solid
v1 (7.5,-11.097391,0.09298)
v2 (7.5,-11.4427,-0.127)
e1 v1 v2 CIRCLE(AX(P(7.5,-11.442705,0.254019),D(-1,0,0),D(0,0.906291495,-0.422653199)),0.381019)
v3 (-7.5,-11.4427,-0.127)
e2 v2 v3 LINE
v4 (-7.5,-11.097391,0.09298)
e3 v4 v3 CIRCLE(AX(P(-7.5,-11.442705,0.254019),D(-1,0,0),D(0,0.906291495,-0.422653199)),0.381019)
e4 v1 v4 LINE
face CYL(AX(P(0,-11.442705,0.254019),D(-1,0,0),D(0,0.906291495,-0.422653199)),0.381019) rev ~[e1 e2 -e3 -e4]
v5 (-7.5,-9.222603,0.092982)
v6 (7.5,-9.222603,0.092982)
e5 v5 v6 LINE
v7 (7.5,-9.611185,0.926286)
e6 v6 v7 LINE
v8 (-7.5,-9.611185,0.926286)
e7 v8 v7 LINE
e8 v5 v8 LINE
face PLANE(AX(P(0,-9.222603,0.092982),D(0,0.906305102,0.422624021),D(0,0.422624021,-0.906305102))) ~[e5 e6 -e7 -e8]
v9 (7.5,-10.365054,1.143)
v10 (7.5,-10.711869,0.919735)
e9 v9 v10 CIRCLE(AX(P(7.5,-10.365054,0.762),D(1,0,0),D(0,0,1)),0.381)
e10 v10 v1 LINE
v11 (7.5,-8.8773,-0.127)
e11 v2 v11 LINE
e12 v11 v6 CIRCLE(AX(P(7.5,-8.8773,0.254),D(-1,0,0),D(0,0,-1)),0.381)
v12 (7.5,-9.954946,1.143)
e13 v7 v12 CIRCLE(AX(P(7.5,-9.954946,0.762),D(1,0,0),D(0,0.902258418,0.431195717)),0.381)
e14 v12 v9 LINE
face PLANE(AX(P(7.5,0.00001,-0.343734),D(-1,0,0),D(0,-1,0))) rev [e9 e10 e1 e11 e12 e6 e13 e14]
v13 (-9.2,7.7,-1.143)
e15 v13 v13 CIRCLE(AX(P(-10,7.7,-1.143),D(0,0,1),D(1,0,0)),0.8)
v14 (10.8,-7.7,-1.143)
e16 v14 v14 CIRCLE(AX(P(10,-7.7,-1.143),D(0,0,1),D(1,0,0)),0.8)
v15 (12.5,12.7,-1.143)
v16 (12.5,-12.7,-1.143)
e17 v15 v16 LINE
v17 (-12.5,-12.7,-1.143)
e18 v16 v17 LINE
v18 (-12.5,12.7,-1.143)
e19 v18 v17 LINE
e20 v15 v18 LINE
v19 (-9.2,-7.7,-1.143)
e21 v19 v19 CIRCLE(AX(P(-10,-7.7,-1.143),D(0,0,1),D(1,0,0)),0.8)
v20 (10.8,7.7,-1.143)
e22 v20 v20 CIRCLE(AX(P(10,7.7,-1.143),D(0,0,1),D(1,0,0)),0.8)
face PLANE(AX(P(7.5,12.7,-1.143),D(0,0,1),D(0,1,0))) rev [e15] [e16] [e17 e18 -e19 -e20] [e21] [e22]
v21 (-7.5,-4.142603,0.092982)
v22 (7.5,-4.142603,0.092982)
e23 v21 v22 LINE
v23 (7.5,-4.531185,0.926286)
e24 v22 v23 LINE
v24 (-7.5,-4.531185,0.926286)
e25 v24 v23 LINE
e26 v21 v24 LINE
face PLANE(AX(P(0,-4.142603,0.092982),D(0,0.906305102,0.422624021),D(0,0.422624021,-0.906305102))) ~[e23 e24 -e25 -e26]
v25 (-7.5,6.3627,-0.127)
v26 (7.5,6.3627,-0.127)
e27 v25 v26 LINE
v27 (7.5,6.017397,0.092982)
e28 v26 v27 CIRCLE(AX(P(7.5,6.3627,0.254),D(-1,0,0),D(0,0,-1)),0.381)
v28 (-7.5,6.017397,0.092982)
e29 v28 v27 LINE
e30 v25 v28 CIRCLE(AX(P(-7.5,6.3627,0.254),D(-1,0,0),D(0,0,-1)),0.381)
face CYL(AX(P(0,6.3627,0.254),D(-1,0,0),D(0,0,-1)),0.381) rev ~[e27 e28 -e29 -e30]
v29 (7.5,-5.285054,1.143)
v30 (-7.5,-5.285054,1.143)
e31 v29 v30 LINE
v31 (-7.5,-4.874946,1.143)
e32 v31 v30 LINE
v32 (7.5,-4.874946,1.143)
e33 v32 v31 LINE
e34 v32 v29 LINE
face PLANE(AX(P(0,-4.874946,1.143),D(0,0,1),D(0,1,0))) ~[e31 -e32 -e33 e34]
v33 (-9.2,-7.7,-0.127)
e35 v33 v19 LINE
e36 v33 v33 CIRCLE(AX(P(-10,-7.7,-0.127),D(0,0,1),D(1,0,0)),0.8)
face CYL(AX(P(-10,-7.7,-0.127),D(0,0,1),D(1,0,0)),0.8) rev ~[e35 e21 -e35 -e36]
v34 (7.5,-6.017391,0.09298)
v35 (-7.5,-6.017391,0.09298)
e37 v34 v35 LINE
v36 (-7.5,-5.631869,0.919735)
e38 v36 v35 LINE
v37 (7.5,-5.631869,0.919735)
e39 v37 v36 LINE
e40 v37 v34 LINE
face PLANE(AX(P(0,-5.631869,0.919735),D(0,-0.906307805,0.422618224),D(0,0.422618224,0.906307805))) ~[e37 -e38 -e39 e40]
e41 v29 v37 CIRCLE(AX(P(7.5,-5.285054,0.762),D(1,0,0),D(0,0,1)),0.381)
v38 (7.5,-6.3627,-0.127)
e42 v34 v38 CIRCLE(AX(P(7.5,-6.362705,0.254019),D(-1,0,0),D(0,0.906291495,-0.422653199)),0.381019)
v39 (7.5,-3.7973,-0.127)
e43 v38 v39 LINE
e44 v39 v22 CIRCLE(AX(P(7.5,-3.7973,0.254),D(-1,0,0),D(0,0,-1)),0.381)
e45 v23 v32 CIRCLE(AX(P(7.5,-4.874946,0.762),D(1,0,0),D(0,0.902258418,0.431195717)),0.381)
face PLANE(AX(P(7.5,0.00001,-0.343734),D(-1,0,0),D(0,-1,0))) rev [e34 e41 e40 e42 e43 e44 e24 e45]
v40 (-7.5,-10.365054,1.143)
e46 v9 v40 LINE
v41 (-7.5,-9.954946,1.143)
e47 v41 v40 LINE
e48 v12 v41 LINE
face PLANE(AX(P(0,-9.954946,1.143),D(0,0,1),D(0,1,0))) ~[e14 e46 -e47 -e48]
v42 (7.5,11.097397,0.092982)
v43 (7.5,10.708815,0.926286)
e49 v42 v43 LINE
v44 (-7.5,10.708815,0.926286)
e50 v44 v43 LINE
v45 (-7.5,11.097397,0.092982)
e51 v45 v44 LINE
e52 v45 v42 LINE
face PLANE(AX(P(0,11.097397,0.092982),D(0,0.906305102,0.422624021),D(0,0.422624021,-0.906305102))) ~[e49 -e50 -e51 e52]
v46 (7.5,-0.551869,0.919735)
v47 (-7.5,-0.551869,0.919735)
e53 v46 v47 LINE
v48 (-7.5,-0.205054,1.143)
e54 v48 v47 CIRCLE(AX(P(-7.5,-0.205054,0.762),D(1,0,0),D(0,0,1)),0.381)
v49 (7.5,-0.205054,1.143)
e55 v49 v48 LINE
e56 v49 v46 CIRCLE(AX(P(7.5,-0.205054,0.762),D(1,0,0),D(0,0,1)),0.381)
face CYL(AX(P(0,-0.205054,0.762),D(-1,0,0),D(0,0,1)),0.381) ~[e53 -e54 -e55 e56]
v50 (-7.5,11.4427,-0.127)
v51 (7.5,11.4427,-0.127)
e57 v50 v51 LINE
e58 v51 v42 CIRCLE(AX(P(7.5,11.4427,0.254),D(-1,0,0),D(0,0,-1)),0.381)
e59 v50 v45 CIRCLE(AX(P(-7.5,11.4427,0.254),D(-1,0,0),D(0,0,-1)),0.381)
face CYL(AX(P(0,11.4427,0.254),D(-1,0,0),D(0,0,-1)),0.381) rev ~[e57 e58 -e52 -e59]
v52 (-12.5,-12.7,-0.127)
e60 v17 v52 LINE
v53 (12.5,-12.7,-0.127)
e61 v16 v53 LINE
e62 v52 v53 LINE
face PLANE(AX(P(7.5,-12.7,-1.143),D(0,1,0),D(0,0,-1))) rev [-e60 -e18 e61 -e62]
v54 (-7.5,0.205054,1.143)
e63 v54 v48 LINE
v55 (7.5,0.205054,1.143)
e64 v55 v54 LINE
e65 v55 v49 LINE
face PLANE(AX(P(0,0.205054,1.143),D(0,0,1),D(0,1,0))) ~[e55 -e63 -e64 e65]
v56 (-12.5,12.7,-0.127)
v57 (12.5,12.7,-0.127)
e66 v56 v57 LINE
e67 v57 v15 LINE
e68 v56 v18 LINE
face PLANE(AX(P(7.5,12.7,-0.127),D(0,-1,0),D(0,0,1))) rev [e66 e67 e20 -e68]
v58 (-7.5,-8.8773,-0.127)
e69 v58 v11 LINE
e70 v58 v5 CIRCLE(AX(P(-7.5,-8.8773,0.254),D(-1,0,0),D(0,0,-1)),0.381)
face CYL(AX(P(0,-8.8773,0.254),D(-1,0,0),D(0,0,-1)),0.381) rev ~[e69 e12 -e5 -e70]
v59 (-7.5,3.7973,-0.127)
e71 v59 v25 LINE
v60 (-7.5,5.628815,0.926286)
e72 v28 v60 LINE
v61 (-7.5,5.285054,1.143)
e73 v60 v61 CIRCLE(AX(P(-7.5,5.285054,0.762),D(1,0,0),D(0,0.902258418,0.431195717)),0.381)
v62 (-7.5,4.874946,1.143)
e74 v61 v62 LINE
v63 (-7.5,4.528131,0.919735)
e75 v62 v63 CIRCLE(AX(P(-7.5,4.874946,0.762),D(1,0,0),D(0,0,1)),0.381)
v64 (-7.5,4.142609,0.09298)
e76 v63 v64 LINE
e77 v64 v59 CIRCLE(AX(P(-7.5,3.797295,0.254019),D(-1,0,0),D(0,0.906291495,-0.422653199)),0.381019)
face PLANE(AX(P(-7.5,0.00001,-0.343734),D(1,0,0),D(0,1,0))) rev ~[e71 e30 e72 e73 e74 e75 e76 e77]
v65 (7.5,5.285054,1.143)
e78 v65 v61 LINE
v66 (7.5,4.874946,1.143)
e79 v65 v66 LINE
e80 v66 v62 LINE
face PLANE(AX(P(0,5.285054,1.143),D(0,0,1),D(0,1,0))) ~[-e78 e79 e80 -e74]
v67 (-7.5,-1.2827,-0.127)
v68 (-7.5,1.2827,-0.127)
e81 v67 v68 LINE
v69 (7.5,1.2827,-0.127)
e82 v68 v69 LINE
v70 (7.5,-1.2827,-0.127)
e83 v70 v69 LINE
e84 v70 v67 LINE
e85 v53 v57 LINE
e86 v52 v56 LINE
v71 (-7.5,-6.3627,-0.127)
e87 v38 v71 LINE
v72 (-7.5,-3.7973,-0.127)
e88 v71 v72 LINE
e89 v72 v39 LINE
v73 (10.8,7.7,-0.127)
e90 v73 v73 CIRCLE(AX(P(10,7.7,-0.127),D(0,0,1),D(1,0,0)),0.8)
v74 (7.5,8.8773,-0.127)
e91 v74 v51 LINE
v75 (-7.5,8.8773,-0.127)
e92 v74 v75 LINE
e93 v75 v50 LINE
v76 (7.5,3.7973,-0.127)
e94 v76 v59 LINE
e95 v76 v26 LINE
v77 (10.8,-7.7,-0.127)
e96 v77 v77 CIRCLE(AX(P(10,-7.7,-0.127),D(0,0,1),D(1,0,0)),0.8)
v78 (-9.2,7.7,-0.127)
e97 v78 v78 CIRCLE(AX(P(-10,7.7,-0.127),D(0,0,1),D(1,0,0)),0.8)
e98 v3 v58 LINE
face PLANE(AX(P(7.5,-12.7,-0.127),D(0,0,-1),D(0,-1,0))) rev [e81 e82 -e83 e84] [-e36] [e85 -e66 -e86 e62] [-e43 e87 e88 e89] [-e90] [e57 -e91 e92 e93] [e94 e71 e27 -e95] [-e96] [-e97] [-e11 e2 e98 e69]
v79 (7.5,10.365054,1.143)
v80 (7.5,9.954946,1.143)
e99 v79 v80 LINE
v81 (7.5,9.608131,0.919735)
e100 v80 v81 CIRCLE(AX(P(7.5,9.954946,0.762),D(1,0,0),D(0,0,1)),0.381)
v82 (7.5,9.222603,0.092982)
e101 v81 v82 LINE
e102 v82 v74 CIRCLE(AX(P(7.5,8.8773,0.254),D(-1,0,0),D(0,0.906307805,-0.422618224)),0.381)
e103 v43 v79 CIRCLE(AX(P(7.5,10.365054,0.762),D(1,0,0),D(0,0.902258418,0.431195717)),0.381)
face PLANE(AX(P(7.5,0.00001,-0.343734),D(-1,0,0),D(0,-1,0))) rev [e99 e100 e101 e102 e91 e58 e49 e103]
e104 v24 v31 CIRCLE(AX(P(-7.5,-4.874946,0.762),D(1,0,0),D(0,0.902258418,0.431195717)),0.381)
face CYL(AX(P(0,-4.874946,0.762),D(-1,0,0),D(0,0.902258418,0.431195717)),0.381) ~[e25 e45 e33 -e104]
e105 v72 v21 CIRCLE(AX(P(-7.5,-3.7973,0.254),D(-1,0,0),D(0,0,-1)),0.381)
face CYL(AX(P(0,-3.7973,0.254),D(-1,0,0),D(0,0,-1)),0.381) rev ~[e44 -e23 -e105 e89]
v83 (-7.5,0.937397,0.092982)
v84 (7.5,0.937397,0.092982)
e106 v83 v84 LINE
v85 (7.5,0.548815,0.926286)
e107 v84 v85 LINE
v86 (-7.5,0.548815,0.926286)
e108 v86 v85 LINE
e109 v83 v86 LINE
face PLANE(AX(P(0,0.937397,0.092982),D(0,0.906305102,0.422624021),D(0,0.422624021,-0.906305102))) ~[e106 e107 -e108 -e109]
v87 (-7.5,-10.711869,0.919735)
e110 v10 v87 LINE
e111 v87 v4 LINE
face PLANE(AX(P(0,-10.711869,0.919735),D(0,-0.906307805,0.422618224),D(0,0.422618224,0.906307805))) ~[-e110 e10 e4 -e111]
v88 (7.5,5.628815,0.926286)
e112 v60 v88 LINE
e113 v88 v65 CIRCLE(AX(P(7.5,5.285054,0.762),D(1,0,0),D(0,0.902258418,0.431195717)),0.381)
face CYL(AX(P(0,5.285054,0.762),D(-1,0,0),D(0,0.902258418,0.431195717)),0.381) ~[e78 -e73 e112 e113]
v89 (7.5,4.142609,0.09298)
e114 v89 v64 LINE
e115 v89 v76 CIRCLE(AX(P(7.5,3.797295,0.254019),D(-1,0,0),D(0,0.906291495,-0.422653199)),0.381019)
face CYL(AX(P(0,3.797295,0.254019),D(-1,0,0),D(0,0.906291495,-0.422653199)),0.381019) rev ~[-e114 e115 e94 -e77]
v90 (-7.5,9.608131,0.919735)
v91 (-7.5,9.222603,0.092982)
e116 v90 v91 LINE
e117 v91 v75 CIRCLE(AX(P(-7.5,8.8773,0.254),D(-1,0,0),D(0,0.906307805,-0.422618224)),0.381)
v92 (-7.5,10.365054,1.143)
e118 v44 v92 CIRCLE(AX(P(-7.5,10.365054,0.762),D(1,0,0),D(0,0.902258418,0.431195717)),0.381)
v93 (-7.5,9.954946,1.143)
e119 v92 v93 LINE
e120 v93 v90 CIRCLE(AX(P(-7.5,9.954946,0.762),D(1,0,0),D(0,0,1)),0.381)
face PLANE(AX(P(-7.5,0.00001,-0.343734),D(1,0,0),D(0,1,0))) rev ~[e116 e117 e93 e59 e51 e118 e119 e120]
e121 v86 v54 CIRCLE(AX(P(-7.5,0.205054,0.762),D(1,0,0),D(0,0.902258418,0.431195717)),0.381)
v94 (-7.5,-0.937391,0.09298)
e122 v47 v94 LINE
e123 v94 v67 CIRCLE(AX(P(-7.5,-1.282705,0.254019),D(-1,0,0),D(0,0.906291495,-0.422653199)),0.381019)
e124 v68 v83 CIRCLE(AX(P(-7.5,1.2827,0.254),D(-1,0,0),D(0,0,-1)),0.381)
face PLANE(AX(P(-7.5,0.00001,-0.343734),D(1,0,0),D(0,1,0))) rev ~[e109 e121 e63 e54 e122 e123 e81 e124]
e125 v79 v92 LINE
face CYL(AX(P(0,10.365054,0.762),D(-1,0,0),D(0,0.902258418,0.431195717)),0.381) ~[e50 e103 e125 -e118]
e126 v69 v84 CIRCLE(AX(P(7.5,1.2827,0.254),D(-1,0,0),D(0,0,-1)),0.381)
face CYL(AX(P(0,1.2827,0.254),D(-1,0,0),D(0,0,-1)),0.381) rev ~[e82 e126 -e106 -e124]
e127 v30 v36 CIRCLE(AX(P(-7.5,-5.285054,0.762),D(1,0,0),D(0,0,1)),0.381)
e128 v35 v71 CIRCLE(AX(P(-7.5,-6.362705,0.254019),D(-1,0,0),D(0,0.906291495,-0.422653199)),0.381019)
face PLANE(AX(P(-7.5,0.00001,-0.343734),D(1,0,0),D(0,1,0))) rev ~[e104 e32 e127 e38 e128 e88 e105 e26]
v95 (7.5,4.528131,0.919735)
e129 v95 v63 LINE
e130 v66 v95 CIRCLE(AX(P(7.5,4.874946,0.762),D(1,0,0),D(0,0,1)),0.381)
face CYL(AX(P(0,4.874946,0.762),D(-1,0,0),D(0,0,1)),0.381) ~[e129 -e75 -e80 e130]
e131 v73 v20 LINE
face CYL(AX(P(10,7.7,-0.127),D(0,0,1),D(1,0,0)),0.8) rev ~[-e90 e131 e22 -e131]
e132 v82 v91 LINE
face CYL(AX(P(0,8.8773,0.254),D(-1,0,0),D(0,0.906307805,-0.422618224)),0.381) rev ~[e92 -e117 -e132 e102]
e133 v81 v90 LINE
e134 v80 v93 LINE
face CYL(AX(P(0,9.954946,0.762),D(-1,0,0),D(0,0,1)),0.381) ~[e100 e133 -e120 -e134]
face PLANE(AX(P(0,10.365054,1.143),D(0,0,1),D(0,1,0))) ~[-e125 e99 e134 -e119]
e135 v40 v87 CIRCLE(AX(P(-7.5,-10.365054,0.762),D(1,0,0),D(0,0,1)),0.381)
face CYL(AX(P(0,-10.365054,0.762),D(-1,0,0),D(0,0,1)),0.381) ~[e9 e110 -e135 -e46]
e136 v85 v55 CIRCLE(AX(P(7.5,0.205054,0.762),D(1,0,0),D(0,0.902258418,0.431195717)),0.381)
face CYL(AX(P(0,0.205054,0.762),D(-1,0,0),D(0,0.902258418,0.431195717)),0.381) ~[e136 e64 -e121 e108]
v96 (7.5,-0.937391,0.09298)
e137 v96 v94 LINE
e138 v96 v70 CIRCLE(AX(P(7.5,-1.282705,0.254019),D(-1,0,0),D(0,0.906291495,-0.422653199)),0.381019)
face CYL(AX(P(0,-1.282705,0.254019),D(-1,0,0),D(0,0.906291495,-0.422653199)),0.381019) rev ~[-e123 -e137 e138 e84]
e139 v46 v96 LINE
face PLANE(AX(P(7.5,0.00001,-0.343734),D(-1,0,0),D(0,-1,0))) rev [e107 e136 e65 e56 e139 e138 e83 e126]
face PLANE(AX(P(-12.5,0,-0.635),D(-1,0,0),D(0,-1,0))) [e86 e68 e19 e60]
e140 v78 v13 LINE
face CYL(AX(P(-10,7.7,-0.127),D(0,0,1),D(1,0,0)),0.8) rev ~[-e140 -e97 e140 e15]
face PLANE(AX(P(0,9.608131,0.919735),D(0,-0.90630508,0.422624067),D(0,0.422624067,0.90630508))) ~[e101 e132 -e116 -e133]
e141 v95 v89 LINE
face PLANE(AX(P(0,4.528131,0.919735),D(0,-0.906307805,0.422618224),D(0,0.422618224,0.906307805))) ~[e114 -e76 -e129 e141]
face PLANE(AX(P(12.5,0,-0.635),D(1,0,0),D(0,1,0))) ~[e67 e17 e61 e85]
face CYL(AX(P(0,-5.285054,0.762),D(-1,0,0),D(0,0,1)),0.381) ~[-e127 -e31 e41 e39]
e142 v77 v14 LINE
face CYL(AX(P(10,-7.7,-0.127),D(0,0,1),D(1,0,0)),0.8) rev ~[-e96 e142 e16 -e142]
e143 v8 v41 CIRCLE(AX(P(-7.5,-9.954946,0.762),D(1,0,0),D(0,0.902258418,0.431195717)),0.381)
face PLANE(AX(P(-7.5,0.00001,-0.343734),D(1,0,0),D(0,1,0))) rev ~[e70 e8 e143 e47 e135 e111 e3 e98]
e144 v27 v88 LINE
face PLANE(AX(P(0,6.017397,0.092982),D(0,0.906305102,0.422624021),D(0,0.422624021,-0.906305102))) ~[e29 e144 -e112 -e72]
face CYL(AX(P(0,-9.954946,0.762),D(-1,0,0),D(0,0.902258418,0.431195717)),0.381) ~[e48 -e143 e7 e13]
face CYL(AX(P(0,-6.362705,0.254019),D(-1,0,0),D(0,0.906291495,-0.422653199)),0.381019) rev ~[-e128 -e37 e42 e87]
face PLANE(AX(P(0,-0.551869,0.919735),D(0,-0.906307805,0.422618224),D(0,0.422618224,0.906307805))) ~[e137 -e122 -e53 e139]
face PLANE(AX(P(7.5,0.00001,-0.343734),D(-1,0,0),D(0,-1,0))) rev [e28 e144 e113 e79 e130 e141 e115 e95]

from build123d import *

# Parameters (mm, degrees)
F1_DEPTH = 7.5
F3_DEPTH = 5
F5_R     = 0.8
F6_DEPTH = 45


# Not quite as in the source:
# - ends of sketch curves that miss each other by under 0.0002 mm in the source are joined
# - a feature names something its author has since deleted; it is built from what else it names


with BuildPart() as f1:
    # F0 (on Right) → F1 (new body)
    with BuildSketch(Plane.YZ):
        with BuildLine():
            ThreePointArc((9.2226032736, 0.0929824566), (9.0820111575, -0.0673321366), (8.8773, -0.127))
            Line((8.8773, -0.127), (6.3627, -0.127))
            ThreePointArc((6.3627, -0.127), (6.1579888425, -0.0673321366), (6.0173967264, 0.0929824566))
            Line((6.0173967264, 0.0929824566), (5.6288146574, 0.9262855682))
            ThreePointArc((5.6288146574, 0.9262855682), (5.4882390894, 1.0842993961), (5.2850542, 1.143))
            Line((5.2850542, 1.143), (4.8749458, 1.143))
            ThreePointArc((4.8749458, 1.143), (4.668712979, 1.0823576494), (4.5281307776, 0.9197350317))
            Line((4.5281307776, 0.9197350317), (4.1426086033, 0.0929799713))
            ThreePointArc((4.1426086033, 0.0929799713), (4.0020111575, -0.0673321366), (3.7973, -0.127))
            Line((3.7973, -0.127), (1.2827, -0.127))
            ThreePointArc((1.2827, -0.127), (1.0779888425, -0.0673321366), (0.9373967264, 0.0929824566))
            Line((0.9373967264, 0.0929824566), (0.5488146574, 0.9262855682))
            ThreePointArc((0.5488146574, 0.9262855682), (0.4082390894, 1.0842993961), (0.2050542, 1.143))
            Line((0.2050542, 1.143), (-0.2050542, 1.143))
            ThreePointArc((-0.2050542, 1.143), (-0.411287021, 1.0823576494), (-0.5518692224, 0.9197350317))
            Line((-0.5518692224, 0.9197350317), (-0.9373913967, 0.0929799713))
            ThreePointArc((-0.9373913967, 0.0929799713), (-1.0779888425, -0.0673321366), (-1.2827, -0.127))
            Line((-1.2827, -0.127), (-3.7973, -0.127))
            ThreePointArc((-3.7973, -0.127), (-4.0020111575, -0.0673321366), (-4.1426032736, 0.0929824566))
            Line((-4.1426032736, 0.0929824566), (-4.5311853426, 0.9262855682))
            ThreePointArc((-4.5311853426, 0.9262855682), (-4.6717609106, 1.0842993961), (-4.8749458, 1.143))
            Line((-4.8749458, 1.143), (-5.2850542, 1.143))
            ThreePointArc((-5.2850542, 1.143), (-5.491287021, 1.0823576494), (-5.6318692224, 0.9197350317))
            Line((-5.6318692224, 0.9197350317), (-6.0173913967, 0.0929799713))
            ThreePointArc((-6.0173913967, 0.0929799713), (-6.1579888425, -0.0673321366), (-6.3627, -0.127))
            Line((-6.3627, -0.127), (-8.8773, -0.127))
            ThreePointArc((-8.8773, -0.127), (-9.0820111575, -0.0673321366), (-9.2226032736, 0.0929824566))
            Line((-9.2226032736, 0.0929824566), (-9.6111853426, 0.9262855682))
            ThreePointArc((-9.6111853426, 0.9262855682), (-9.7517609106, 1.0842993961), (-9.9549458, 1.143))
            Line((-9.9549458, 1.143), (-10.3650542, 1.143))
            ThreePointArc((-10.3650542, 1.143), (-10.571287021, 1.0823576494), (-10.7118692224, 0.9197350317))
            Line((-10.7118692224, 0.9197350317), (-11.0973913967, 0.0929799713))
            ThreePointArc((-11.0973913967, 0.0929799713), (-11.2379888425, -0.0673321366), (-11.4427, -0.127))
            Line((-11.4427, -0.127), (-12.7, -0.127))
            Line((-12.7, -0.127), (-12.7, -1.143))
            Line((-12.7, -1.143), (12.7, -1.143))
            Line((12.7, -1.143), (12.7, -0.127))
            Line((12.7, -0.127), (11.4427, -0.127))
            ThreePointArc((11.4427, -0.127), (11.2379888425, -0.0673321366), (11.0973967264, 0.0929824566))
            Line((11.0973967264, 0.0929824566), (10.7088146574, 0.9262855682))
            ThreePointArc((10.7088146574, 0.9262855682), (10.5682390894, 1.0842993961), (10.3650542, 1.143))
            Line((10.3650542, 1.143), (9.9549458, 1.143))
            ThreePointArc((9.9549458, 1.143), (9.748712979, 1.0823576494), (9.6081307776, 0.9197350317))
            Line((9.6081307776, 0.9197350317), (9.2226032736, 0.0929824566))
        make_face()
    extrude(amount=-F1_DEPTH)

    # F2 (on face) → F3 (join)
    with BuildSketch(Plane(origin=(-7.5, 0, 0), x_dir=(0, -1, 0), z_dir=(-1, 0, 0))):
        Polygon((-11.4427, -0.127), (-12.7, -0.127), (-12.7, -1.143), (12.7, -1.143), (12.7, -0.127), (11.4427, -0.127), (8.8773, -0.127), (6.3627, -0.127), (3.7973, -0.127), (1.2827, -0.127), (-1.2827, -0.127), (-3.7973, -0.127), (-6.3627, -0.127), (-8.8773, -0.127), align=None)
    extrude(amount=F3_DEPTH)

    # F4: F1 across plane


with BuildPart() as f1_1:
    add(f1.part)
    add(f1.part.mirror(Plane.YZ))

    # F5 (on face) → F6 (cut)
    with BuildSketch(Plane.XY.offset(-0.127)):
        with Locations((10, 7.7)):
            Circle(F5_R)
        with Locations((10, -7.7)):
            Circle(F5_R)
        with Locations((-10, 7.7)):
            Circle(F5_R)
        with Locations((-10, -7.7)):
            Circle(F5_R)
    extrude(amount=-F6_DEPTH, mode=Mode.SUBTRACT)


solid = f1_1.part
